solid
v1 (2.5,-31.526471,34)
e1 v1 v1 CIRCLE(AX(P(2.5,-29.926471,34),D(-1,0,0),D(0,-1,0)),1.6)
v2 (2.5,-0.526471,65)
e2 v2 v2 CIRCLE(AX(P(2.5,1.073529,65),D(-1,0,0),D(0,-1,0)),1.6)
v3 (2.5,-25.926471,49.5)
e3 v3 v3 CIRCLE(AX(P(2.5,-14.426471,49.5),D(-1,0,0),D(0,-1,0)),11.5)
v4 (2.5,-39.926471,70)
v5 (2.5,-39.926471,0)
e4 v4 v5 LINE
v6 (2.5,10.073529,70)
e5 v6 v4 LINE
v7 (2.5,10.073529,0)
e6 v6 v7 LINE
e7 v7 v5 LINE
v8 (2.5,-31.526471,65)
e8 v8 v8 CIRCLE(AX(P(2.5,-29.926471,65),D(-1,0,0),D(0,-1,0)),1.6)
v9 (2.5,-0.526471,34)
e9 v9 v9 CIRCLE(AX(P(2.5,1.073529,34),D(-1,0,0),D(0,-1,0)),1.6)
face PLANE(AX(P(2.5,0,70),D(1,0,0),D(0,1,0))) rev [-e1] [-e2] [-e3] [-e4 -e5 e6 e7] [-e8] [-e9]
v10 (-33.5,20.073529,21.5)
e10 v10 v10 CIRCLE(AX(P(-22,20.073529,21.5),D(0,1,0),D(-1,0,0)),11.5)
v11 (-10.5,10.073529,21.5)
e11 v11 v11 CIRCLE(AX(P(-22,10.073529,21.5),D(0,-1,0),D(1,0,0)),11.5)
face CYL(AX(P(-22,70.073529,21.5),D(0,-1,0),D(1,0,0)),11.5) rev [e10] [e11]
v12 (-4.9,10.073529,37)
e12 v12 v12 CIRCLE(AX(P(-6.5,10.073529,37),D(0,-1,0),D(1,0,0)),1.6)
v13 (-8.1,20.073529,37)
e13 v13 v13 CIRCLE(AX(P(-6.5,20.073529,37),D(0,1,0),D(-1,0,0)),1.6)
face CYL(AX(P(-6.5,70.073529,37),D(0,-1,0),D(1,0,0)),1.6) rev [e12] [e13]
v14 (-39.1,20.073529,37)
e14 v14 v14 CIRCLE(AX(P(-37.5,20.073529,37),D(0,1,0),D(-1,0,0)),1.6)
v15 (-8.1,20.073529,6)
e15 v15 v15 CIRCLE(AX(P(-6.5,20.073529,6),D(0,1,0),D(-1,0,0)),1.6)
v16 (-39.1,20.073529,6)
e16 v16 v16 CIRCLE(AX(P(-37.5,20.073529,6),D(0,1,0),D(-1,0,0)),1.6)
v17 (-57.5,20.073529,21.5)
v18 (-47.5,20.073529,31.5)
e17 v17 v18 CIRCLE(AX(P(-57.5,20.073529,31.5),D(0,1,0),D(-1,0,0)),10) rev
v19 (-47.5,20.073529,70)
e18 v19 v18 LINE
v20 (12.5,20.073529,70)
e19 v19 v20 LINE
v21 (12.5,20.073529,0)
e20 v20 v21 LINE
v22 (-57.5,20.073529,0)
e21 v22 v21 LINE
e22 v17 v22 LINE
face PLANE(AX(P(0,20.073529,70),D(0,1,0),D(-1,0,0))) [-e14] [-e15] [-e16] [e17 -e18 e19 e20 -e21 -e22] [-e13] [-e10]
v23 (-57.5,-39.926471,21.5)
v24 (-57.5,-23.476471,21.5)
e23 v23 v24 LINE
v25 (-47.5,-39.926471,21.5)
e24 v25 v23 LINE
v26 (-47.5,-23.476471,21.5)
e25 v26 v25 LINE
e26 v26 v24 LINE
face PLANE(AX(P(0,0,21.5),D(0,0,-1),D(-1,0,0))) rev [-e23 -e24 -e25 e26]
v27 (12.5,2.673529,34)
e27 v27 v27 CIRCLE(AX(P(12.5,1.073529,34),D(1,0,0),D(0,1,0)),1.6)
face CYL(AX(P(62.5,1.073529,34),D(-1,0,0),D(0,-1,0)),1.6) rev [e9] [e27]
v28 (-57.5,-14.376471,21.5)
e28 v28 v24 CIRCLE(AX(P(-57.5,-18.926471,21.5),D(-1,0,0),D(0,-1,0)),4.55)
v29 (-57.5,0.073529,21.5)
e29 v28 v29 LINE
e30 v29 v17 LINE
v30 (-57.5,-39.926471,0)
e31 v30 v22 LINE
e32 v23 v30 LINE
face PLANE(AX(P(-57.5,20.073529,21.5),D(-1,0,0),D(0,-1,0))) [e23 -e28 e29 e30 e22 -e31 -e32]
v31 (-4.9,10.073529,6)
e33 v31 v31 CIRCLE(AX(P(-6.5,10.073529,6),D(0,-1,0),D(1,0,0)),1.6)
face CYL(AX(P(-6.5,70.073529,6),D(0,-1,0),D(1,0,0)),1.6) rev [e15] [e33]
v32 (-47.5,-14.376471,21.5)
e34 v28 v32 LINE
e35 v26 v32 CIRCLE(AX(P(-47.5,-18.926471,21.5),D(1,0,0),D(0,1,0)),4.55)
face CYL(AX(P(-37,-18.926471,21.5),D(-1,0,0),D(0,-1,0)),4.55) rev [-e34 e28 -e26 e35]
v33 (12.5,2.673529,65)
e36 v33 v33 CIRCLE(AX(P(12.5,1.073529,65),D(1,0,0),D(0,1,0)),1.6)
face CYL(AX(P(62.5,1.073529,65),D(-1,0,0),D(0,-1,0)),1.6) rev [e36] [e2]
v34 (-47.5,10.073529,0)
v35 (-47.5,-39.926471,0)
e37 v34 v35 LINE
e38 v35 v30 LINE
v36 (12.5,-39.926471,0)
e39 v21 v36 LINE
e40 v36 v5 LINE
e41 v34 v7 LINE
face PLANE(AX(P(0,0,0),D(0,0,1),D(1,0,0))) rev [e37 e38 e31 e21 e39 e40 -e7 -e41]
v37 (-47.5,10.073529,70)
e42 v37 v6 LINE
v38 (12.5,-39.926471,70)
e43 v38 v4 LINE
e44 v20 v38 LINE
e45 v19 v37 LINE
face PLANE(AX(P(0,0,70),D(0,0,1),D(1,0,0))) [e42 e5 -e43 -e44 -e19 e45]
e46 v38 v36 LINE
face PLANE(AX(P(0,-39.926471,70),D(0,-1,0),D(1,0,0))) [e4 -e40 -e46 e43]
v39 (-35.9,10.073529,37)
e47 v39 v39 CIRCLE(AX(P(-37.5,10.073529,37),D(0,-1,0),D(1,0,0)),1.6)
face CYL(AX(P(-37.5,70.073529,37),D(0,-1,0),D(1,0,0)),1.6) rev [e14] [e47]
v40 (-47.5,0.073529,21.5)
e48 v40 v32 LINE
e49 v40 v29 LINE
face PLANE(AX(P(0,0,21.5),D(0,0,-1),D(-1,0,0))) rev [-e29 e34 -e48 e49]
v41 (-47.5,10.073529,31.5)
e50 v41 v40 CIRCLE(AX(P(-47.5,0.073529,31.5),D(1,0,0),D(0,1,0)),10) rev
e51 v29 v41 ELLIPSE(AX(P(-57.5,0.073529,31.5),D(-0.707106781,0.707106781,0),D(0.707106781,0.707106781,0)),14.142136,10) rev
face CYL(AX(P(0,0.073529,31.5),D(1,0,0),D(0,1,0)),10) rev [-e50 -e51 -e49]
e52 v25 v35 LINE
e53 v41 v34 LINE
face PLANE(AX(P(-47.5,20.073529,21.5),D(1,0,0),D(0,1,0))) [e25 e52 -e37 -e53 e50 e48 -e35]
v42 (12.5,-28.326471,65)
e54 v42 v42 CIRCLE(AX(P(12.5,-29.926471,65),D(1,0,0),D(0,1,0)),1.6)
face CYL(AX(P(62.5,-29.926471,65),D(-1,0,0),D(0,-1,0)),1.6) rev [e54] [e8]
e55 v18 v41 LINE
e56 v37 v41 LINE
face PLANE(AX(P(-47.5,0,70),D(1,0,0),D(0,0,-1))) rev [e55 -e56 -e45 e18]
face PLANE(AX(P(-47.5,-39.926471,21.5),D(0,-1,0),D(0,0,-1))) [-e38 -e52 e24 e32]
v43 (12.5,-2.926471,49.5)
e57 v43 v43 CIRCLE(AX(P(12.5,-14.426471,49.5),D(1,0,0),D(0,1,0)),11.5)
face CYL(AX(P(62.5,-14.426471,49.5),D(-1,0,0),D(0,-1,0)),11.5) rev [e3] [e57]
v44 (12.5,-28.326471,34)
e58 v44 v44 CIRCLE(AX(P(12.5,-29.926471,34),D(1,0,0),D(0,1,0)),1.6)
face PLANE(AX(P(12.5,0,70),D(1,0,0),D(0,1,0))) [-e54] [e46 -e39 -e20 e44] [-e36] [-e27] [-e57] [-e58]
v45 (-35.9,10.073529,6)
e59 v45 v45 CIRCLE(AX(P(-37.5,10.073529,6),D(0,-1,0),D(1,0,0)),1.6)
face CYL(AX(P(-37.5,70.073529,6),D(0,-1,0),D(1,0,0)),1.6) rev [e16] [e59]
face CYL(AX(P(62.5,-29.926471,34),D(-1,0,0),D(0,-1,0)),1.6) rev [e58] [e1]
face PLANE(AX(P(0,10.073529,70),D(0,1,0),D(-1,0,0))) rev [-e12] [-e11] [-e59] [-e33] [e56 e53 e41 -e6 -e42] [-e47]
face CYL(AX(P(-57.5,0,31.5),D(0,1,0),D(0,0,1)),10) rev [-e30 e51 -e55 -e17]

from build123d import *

# Parameters (mm, degrees)
EXTRUDE_1_DEPTH     = 70
SKETCH_2_R          = 1.5999999999999974
SKETCH_2_R_2        = 1.5999999999999979
SKETCH_2_R_3        = 1.6000000000000019
SKETCH_2_R_4        = 1.599999999999995
SKETCH_2_R_5        = 11.5
CUT_EXTRUDE_1_DEPTH = 60
SKETCH_4_R          = 1.6000000000000052
SKETCH_4_R_2        = 1.600000000000005
SKETCH_4_R_3        = 11.499999999999998
CUT_EXTRUDE_2_DEPTH = 60
EXTRUDE_2_DEPTH     = 21.5
SKETCH_7_R          = 4.549999999999999
CUT_EXTRUDE_3_DEPTH = 20.5
FILLET_1_R          = 10
FILLET_START        = 9.961129412
FILLET_2_DEPTH      = 10.1124
FILLET_START_2      = 0.073529412
FILLET_2_2_DEPTH    = 9.8876
FILLET_START_3      = -57.5
FILLET_2_3_DEPTH    = 10


with BuildPart() as part:
    # 草图1 → 凸台-拉伸1 (new body)
    with BuildSketch(Plane.XY):
        Polygon((2.500000000000014, 20.073529411764707), (-47.499999999999986, 20.073529411764703), (-47.499999999999986, 10.073529411764701), (2.500000000000014, 10.073529411764705), (2.5000000000000178, -39.9264705882353), (12.500000000000018, -39.92647058823529), (12.500000000000012, 10.073529411764705), (12.50000000000001, 20.073529411764707), align=None)
    extrude(amount=EXTRUDE_1_DEPTH)

    # 草图2 → 切除-拉伸1 (cut)
    with BuildSketch(Plane.XZ.offset(-10.073529411764705)):
        with Locations((-37.49999999999999, 37)):
            Circle(SKETCH_2_R)
        with Locations((-37.49999999999998, 6)):
            Circle(SKETCH_2_R_2)
        with Locations((-6.4999999999999885, 5.999999999999998)):
            Circle(SKETCH_2_R_3)
        with Locations((-6.499999999999992, 36.99999999999999)):
            Circle(SKETCH_2_R_4)
        with Locations((-21.999999999999996, 21.499999999999996)):
            Circle(SKETCH_2_R_5)
    extrude(amount=-CUT_EXTRUDE_1_DEPTH, mode=Mode.SUBTRACT)

    # 草图4 → 切除-拉伸2 (cut)
    with BuildSketch(Plane.ZY.offset(-2.500000000000012)):
        with Locations(Location((34, 1.0735294117647036, 0), (0, 0, 270))):
            Circle(SKETCH_4_R)
        with Locations(Location((34.000000000000014, -29.926470588235297, 0), (0, 0, 270))):
            Circle(SKETCH_4_R_2)
        with Locations(Location((65, -29.926470588235297, 0), (0, 0, 270))):
            Circle(SKETCH_4_R_2)
        with Locations(Location((65, 1.0735294117647038, 0), (0, 0, 270))):
            Circle(SKETCH_4_R)
        with Locations(Location((49.5, -14.426470588235297, 0), (0, 0, 270))):
            Circle(SKETCH_4_R_3)
    extrude(amount=-CUT_EXTRUDE_2_DEPTH, mode=Mode.SUBTRACT)

    # 草图6 → 凸台-拉伸2 (add)
    with BuildSketch(Plane(origin=(0, 0, 0), x_dir=(-1, 0, 0), z_dir=(0, 0, -1))):
        Polygon((47.499999999999986, 20.073529411764703), (57.499999999999986, 20.073529411764703), (57.49999999999999, -39.9264705882353), (47.49999999999999, -39.9264705882353), align=None)
    extrude(amount=-EXTRUDE_2_DEPTH)

    # 草图7 → 切除-拉伸3 (cut)
    with BuildSketch(Plane.ZY.offset(57.499999999999986)):
        with Locations((21.5, -18.926470588235297)):
            Circle(SKETCH_7_R)
    extrude(amount=-CUT_EXTRUDE_3_DEPTH, mode=Mode.SUBTRACT)

    # 圆角1
    fillet_1_edges = [part.edges().sort_by_distance(p)[0] for p in [
        (-47.499999999999986, 15.073529411764703, 21.5),
    ]]
    fillet(fillet_1_edges, radius=FILLET_1_R - 0.0001)  # a hair under: the kernel refuses the full size

    # 圆角2: read off the stored shape, not the designer's step
    # 圆角2 outline → 圆角2 (add)
    with BuildSketch(Plane(origin=(0, 0, 0), x_dir=(1, 0, 0), z_dir=(0, 1, 0)).offset(FILLET_START)):
        with BuildLine():
            ThreePointArc((-57.5, -21.5), (-50.428932188, -24.428932188), (-47.5, -31.5))
            Line((-47.5, -31.5), (-47.5, -21.5))
            Line((-47.5, -21.5), (-57.5, -21.5))
        make_face()
    extrude(amount=FILLET_2_DEPTH)

    # Fillet 2 2 outline → Fillet 2 2 (add)
    with BuildSketch(Plane(origin=(0, 0, 0), x_dir=(1, 0, 0), z_dir=(0, 1, 0)).offset(FILLET_START_2)):
        with BuildLine():
            ThreePointArc((-57.5, -21.5), (-50.428932188, -24.428932188), (-47.5, -31.5))
            Line((-47.5, -31.5), (-47.5, -21.5))
            Line((-47.5, -21.5), (-57.5, -21.5))
        make_face()
    extrude(amount=FILLET_2_2_DEPTH)

    # Fillet 2 3 outline → Fillet 2 3 (cut)
    with BuildSketch(Plane.YZ.offset(FILLET_START_3)):
        with BuildLine():
            Line((0.073529412, 33), (0.073529412, 21.5))
            ThreePointArc((0.073529412, 21.5), (7.144597224, 24.428932188), (10.073529412, 31.5))
            Line((10.073529412, 31.5), (10.073529412, 33))
            Line((10.073529412, 33), (0.073529412, 33))
        make_face()
    extrude(amount=FILLET_2_3_DEPTH, mode=Mode.SUBTRACT)


solid = part.part
